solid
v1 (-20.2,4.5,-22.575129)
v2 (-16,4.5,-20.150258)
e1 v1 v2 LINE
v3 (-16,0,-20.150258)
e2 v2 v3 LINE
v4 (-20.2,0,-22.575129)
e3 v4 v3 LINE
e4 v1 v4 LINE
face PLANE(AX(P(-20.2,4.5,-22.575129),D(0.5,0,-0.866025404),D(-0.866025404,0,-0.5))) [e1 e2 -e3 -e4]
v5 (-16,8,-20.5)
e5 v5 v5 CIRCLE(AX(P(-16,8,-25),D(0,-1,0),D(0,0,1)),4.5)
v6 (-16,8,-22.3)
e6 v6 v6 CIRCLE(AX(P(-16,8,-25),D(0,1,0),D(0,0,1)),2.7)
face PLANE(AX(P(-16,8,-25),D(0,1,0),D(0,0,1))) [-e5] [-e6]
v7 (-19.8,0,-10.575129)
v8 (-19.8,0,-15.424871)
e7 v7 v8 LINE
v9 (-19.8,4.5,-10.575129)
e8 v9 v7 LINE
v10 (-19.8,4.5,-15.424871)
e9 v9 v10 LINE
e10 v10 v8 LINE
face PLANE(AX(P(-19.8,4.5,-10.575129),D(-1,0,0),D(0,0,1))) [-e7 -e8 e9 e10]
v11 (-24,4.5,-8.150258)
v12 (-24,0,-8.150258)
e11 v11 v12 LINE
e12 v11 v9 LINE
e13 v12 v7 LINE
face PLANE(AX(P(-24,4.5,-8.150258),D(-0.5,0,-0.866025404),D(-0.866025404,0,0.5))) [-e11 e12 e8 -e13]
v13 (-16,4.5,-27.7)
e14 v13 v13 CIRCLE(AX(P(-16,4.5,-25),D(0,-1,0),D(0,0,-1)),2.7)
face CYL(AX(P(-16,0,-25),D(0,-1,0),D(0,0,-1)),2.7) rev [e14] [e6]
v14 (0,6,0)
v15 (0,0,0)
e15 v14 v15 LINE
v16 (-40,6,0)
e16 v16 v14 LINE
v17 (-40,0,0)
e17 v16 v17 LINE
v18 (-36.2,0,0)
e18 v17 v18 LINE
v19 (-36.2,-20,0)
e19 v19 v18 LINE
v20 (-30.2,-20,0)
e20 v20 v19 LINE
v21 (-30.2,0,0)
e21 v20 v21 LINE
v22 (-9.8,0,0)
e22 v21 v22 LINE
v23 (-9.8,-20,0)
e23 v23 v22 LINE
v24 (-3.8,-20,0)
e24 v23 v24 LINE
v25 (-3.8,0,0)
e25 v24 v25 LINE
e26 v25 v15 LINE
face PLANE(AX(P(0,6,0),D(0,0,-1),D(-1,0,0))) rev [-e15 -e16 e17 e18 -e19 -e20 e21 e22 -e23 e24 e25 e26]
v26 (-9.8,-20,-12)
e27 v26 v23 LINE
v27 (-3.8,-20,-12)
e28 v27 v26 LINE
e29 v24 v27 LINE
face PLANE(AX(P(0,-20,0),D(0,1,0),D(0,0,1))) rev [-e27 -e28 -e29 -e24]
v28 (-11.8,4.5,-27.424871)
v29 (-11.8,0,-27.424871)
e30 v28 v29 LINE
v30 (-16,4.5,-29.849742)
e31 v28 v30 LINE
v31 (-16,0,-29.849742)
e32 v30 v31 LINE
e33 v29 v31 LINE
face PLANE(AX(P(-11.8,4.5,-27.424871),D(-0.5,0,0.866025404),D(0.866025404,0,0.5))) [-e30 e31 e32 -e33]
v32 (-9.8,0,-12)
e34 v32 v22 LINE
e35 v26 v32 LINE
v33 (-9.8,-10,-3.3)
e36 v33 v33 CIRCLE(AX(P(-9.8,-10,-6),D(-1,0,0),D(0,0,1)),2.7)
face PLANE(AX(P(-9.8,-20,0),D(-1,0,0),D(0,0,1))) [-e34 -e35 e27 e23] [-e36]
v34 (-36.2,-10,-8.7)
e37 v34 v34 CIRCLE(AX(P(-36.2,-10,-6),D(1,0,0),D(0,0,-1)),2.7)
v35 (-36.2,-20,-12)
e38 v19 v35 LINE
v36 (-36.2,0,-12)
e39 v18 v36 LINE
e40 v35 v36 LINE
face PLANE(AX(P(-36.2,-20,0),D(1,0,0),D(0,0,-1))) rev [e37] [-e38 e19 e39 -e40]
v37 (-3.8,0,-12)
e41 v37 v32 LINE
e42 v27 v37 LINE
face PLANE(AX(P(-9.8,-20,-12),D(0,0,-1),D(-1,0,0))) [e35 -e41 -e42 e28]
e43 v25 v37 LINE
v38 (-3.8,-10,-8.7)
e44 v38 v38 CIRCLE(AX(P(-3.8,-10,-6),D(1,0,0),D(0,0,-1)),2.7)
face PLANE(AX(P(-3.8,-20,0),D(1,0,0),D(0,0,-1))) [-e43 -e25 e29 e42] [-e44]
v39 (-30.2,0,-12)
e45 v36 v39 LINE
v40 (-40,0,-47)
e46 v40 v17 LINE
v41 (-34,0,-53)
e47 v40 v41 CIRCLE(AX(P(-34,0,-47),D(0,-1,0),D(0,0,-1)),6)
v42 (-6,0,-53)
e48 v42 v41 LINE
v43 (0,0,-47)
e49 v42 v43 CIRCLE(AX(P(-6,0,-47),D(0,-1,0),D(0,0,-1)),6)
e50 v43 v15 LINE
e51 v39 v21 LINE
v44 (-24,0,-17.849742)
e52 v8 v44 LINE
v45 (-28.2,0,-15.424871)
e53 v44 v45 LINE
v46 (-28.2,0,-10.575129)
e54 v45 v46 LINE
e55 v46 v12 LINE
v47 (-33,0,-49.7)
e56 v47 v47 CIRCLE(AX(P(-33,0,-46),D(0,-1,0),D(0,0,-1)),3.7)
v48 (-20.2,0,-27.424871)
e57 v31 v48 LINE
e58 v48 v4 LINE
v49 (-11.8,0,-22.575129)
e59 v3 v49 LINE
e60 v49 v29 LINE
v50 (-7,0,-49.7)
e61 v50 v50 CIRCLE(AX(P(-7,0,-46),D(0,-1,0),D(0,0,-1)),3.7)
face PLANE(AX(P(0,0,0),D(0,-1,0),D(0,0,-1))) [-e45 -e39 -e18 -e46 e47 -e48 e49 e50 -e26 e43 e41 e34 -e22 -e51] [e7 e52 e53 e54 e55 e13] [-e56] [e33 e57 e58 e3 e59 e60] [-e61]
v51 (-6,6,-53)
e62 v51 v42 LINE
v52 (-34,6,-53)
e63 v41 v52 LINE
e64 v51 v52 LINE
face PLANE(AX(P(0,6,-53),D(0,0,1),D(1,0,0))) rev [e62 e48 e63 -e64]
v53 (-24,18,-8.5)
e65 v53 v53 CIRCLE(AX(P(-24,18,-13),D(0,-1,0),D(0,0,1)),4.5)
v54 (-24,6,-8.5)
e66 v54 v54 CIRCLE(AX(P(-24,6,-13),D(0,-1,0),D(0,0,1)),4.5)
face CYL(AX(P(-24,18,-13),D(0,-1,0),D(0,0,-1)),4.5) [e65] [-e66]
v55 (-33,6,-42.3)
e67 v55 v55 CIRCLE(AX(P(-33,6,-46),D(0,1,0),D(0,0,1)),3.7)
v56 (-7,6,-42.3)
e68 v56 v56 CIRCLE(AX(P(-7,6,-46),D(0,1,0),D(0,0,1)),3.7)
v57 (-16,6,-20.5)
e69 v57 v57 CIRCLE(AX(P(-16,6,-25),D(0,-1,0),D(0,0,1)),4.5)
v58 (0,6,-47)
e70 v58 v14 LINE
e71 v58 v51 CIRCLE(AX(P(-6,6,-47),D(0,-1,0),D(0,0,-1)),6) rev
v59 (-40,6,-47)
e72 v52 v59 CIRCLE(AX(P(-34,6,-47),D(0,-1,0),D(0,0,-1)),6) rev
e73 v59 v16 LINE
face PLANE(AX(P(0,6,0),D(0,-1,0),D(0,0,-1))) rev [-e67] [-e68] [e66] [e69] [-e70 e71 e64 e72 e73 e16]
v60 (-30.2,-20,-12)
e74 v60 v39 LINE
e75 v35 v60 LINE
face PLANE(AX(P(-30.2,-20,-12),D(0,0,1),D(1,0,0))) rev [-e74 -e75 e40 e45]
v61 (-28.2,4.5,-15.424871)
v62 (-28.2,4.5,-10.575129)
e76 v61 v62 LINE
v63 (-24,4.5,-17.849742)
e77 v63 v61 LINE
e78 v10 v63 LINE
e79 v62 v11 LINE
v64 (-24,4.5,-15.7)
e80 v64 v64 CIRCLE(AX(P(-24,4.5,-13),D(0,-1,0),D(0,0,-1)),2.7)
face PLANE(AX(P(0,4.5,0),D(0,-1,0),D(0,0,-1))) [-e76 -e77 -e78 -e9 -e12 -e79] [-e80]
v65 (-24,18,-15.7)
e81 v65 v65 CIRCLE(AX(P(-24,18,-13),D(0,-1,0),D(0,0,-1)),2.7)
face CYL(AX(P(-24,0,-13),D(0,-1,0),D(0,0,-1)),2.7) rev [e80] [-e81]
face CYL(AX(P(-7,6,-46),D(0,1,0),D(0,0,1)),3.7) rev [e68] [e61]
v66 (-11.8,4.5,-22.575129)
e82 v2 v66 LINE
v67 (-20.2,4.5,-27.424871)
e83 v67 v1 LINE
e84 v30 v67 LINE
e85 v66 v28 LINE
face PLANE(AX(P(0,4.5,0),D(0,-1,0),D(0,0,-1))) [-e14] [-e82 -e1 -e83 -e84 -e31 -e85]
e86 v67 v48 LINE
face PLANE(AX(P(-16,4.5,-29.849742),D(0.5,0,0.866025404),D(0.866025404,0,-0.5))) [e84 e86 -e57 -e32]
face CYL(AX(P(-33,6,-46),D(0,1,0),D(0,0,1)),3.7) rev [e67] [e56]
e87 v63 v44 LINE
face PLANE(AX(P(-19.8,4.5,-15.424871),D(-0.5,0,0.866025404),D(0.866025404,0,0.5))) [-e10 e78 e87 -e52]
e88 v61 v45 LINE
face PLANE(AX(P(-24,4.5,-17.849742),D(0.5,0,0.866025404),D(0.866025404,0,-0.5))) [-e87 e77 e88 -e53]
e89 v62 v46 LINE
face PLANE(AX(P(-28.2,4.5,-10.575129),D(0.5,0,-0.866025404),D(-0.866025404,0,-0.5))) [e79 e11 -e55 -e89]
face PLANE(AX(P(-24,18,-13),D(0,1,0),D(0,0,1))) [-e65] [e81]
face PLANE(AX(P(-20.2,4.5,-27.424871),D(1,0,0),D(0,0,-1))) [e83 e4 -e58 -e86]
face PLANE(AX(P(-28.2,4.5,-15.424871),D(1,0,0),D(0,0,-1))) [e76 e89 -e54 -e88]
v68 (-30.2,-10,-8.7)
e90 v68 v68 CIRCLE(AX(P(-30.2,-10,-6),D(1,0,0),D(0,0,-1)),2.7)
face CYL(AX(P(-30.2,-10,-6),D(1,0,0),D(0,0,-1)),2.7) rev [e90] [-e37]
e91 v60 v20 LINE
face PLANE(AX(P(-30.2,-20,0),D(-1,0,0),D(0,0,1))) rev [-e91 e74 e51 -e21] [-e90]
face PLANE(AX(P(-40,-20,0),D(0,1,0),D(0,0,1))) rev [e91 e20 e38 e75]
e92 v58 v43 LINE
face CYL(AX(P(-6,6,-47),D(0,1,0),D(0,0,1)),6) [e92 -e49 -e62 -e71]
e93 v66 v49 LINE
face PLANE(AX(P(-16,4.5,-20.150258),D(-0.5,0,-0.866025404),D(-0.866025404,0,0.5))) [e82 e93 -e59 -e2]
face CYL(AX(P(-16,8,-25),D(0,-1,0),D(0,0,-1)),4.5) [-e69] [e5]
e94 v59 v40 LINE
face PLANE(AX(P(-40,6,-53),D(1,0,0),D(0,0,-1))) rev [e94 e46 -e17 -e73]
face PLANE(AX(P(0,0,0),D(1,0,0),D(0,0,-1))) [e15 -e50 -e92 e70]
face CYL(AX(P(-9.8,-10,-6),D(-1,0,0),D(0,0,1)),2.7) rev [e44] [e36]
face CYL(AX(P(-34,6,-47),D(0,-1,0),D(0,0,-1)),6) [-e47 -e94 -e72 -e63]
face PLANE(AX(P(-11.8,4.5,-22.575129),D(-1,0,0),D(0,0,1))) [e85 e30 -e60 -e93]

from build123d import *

# Parameters (mm, degrees)
SKETCH1_W             = 40
SKETCH1_H             = 53
BOSS_EXTRUDE1_DEPTH   = 6
SKETCH16_R            = 4.5
BOSS_EXTRUDE3_DEPTH   = 2
SKETCH16_3_R          = 4.5
BOSS_EXTRUDE4_DEPTH   = 12
CUT_EXTRUDE1_DEPTH    = 4.5
F_5_4MM_DOWEL_HOLE1_D = 5.4
F_7_4MM_DOWEL_HOLE2_D = 7.4
SKETCH2_W             = 6
SKETCH2_H             = 12
BOSS_EXTRUDE2_DEPTH   = 20
F_5_4MM_DOWEL_HOLE3_D = 5.4
FILLET1_R             = 6
MIRROR2_OUTLINE_R     = 3.7
MIRROR2_DEPTH         = 6
MIRROR2_START         = 4.5
MIRROR2_2_OUTLINE_R   = 4.5
MIRROR2_2_OUTLINE_R_2 = 2.7
MIRROR2_2_DEPTH       = 13.5
MIRROR2_3_OUTLINE_R   = 4.5
MIRROR2_3_OUTLINE_R_2 = 2.7
MIRROR2_3_DEPTH       = 3.5
MIRROR2_4_DEPTH       = 1.5
MIRROR2_START_2       = -36.2
MIRROR2_5_OUTLINE_W   = 20
MIRROR2_5_OUTLINE_H   = 12
MIRROR2_5_OUTLINE_R   = 2.7
MIRROR2_5_DEPTH       = 6
MIRROR2_START_3       = -9.8
MIRROR2_6_OUTLINE_W   = 20
MIRROR2_6_OUTLINE_H   = 12
MIRROR2_6_OUTLINE_R   = 2.7
MIRROR2_6_DEPTH       = 6


# Read off the part's stored shape, not the designer's step: Mirror2
with BuildPart() as part:
    # Sketch1 → Boss-Extrude1 (new body)
    with BuildSketch(Plane(origin=(0, 0, 0), x_dir=(1, 0, 0), z_dir=(0, 1, 0))):
        with Locations((20, 26.5)):
            Rectangle(SKETCH1_W, SKETCH1_H)
    extrude(amount=BOSS_EXTRUDE1_DEPTH)

    # Sketch16 → Boss-Extrude3 (add)
    with BuildSketch(Plane(origin=(0, 6, 0), x_dir=(1, 0, 0), z_dir=(0, 1, 0))):
        with Locations(Location((16, 25, 0), (0, 0, 90))):
            Circle(SKETCH16_R)
    extrude(amount=BOSS_EXTRUDE3_DEPTH)

    # Sketch16<3> → Boss-Extrude4 (add)
    with BuildSketch(Plane(origin=(0, 6, 0), x_dir=(1, 0, 0), z_dir=(0, 1, 0))):
        with Locations(Location((24, 13, 0), (0, 0, 90))):
            Circle(SKETCH16_3_R)
    extrude(amount=BOSS_EXTRUDE4_DEPTH)

    # Sketch12 → Cut-Extrude1 (cut)
    with BuildSketch(Plane.XZ):
        Polygon((28.2, -10.575128869), (24, -8.150257739), (19.8, -10.575128869), (19.8, -15.424871131), (24, -17.849742261), (28.2, -15.424871131), align=None)
        Polygon((16, -20.150257739), (11.8, -22.575128869), (11.8, -27.424871131), (16, -29.849742261), (20.2, -27.424871131), (20.2, -22.575128869), align=None)
    extrude(amount=-CUT_EXTRUDE1_DEPTH, mode=Mode.SUBTRACT)

    # Ø5.4mm Dowel Hole1 (through all)
    with Locations(Plane(origin=(0, 0, 0), x_dir=(-1, 0, 0), z_dir=(0, -1, 0))):
        with Locations((-16, 25), (-24, 13)):
            Hole(F_5_4MM_DOWEL_HOLE1_D / 2)

    # Ø7.4mm Dowel Hole2 (through all)
    with Locations(Plane(origin=(0, 6, 0), x_dir=(1, 0, 0), z_dir=(0, 1, 0))):
        with Locations((7, 46)):
            f_7_4mm_dowel_hole2 = Hole(F_7_4MM_DOWEL_HOLE2_D / 2)

    # Sketch2 → Boss-Extrude2 (add)
    with BuildSketch(Plane.XZ):
        with Locations((6.8, -6)):
            Rectangle(SKETCH2_W, SKETCH2_H)
    boss_extrude2 = extrude(amount=BOSS_EXTRUDE2_DEPTH)

    # Ø5.4mm Dowel Hole3 (through all)
    with Locations(Plane(origin=(9.8, 0, 0), x_dir=(0, 0, -1), z_dir=(1, 0, 0))):
        with Locations((6, -10)):
            f_5_4mm_dowel_hole3 = Hole(F_5_4MM_DOWEL_HOLE3_D / 2)

    # Mirror1: Ø7.4mm Dowel Hole2, Boss-Extrude2, Ø5.4mm Dowel Hole3 across plane
    add(f_7_4mm_dowel_hole2.mirror(Plane(origin=(20, 0, 0), x_dir=(0, 0, 1), z_dir=(1, 0, 0))), mode=Mode.SUBTRACT)
    add(boss_extrude2.mirror(Plane(origin=(20, 0, 0), x_dir=(0, 0, 1), z_dir=(1, 0, 0))))
    add(f_5_4mm_dowel_hole3.mirror(Plane(origin=(20, 0, 0), x_dir=(0, 0, 1), z_dir=(1, 0, 0))), mode=Mode.SUBTRACT)

    # Fillet1
    fillet1_edges = [part.edges().sort_by_distance(p)[0] for p in [
        (0, 3, -53),
        (40, 3, -53),
    ]]
    fillet(fillet1_edges, radius=FILLET1_R)

    # Mirror2 outline → Mirror2 (add)
    with BuildSketch(Plane(origin=(0, 0, 0), x_dir=(1, 0, 0), z_dir=(0, 1, 0))):
        with BuildLine():
            Line((-6, 53), (-34, 53))
            ThreePointArc((-34, 53), (-38.242640687, 51.242640687), (-40, 47))
            Line((-40, 47), (-40, 0))
            Line((-40, 0), (0, 0))
            Line((0, 0), (0, 47))
            ThreePointArc((0, 47), (-1.757359313, 51.242640687), (-6, 53))
        make_face()
        Polygon((-19.8, 10.575128869), (-24, 8.150257739), (-28.2, 10.575128869), (-28.2, 15.424871131), (-24, 17.849742261), (-19.8, 15.424871131), align=None, mode=Mode.SUBTRACT)
        with Locations((-33, 46)):
            Circle(MIRROR2_OUTLINE_R, mode=Mode.SUBTRACT)
        with Locations((-7, 46)):
            Circle(MIRROR2_OUTLINE_R, mode=Mode.SUBTRACT)
        Polygon((-11.8, 27.424871131), (-11.8, 22.575128869), (-16, 20.150257739), (-20.2, 22.575128869), (-20.2, 27.424871131), (-16, 29.849742261), align=None, mode=Mode.SUBTRACT)
    extrude(amount=MIRROR2_DEPTH)

    # Mirror2 2 outline → Mirror2 2 (add)
    with BuildSketch(Plane(origin=(0, 0, 0), x_dir=(1, 0, 0), z_dir=(0, 1, 0)).offset(MIRROR2_START)):
        with Locations((-24, 13)):
            Circle(MIRROR2_2_OUTLINE_R)
        with Locations((-24, 13)):
            Circle(MIRROR2_2_OUTLINE_R_2, mode=Mode.SUBTRACT)
    extrude(amount=MIRROR2_2_DEPTH)

    # Mirror2 3 outline → Mirror2 3 (add)
    with BuildSketch(Plane(origin=(0, 0, 0), x_dir=(1, 0, 0), z_dir=(0, 1, 0)).offset(MIRROR2_START)):
        with Locations((-16, 25)):
            Circle(MIRROR2_3_OUTLINE_R)
        with Locations((-16, 25)):
            Circle(MIRROR2_3_OUTLINE_R_2, mode=Mode.SUBTRACT)
    extrude(amount=MIRROR2_3_DEPTH)

    # Mirror2 4 outline → Mirror2 4 (add)
    with BuildSketch(Plane(origin=(0, 0, 0), x_dir=(1, 0, 0), z_dir=(0, 1, 0)).offset(MIRROR2_START)):
        with BuildLine():
            ThreePointArc((-20.500893142, 15.829531975), (-20.102885683, 15.25), (-19.8, 14.615549442))
            Line((-19.8, 14.615549442), (-19.8, 15.424871131))
            Line((-19.8, 15.424871131), (-20.500893142, 15.829531975))
        make_face()
        with BuildLine():
            Line((-19.8, 10.575128869), (-19.8, 11.384450558))
            ThreePointArc((-19.8, 11.384450558), (-20.102885683, 10.75), (-20.500893142, 10.170468025))
            Line((-20.500893142, 10.170468025), (-19.8, 10.575128869))
        make_face()
        with BuildLine():
            ThreePointArc((-24.700893142, 17.445081417), (-24, 17.5), (-23.299106858, 17.445081417))
            Line((-23.299106858, 17.445081417), (-24, 17.849742261))
            Line((-24, 17.849742261), (-24.700893142, 17.445081417))
        make_face()
        with BuildLine():
            Line((-24, 8.150257739), (-23.299106858, 8.554918583))
            ThreePointArc((-23.299106858, 8.554918583), (-24, 8.5), (-24.700893142, 8.554918583))
            Line((-24.700893142, 8.554918583), (-24, 8.150257739))
        make_face()
        with BuildLine():
            ThreePointArc((-28.2, 14.615549442), (-27.897114317, 15.25), (-27.499106858, 15.829531975))
            Line((-27.499106858, 15.829531975), (-28.2, 15.424871131))
            Line((-28.2, 15.424871131), (-28.2, 14.615549442))
        make_face()
        with BuildLine():
            Line((-28.2, 10.575128869), (-27.499106858, 10.170468025))
            ThreePointArc((-27.499106858, 10.170468025), (-27.897114317, 10.75), (-28.2, 11.384450558))
            Line((-28.2, 11.384450558), (-28.2, 10.575128869))
        make_face()
        with BuildLine():
            ThreePointArc((-12.500893142, 27.829531975), (-12.102885683, 27.25), (-11.8, 26.615549442))
            Line((-11.8, 26.615549442), (-11.8, 27.424871131))
            Line((-11.8, 27.424871131), (-12.500893142, 27.829531975))
        make_face()
        with BuildLine():
            Line((-11.8, 22.575128869), (-11.8, 23.384450558))
            ThreePointArc((-11.8, 23.384450558), (-12.102885683, 22.75), (-12.500893142, 22.170468025))
            Line((-12.500893142, 22.170468025), (-11.8, 22.575128869))
        make_face()
        with BuildLine():
            ThreePointArc((-16.700893142, 29.445081417), (-16, 29.5), (-15.299106858, 29.445081417))
            Line((-15.299106858, 29.445081417), (-16, 29.849742261))
            Line((-16, 29.849742261), (-16.700893142, 29.445081417))
        make_face()
        with BuildLine():
            Line((-16, 20.150257739), (-15.299106858, 20.554918583))
            ThreePointArc((-15.299106858, 20.554918583), (-16, 20.5), (-16.700893142, 20.554918583))
            Line((-16.700893142, 20.554918583), (-16, 20.150257739))
        make_face()
        with BuildLine():
            ThreePointArc((-20.2, 26.615549442), (-19.897114317, 27.25), (-19.499106858, 27.829531975))
            Line((-19.499106858, 27.829531975), (-20.2, 27.424871131))
            Line((-20.2, 27.424871131), (-20.2, 26.615549442))
        make_face()
        with BuildLine():
            Line((-20.2, 22.575128869), (-19.499106858, 22.170468025))
            ThreePointArc((-19.499106858, 22.170468025), (-19.897114317, 22.75), (-20.2, 23.384450558))
            Line((-20.2, 23.384450558), (-20.2, 22.575128869))
        make_face()
    extrude(amount=MIRROR2_4_DEPTH)

    # Mirror2 5 outline → Mirror2 5 (add)
    with BuildSketch(Plane.YZ.offset(MIRROR2_START_2)):
        with Locations((-10, -6)):
            Rectangle(MIRROR2_5_OUTLINE_W, MIRROR2_5_OUTLINE_H)
        with Locations((-10, -6)):
            Circle(MIRROR2_5_OUTLINE_R, mode=Mode.SUBTRACT)
    extrude(amount=MIRROR2_5_DEPTH)

    # Mirror2 6 outline → Mirror2 6 (add)
    with BuildSketch(Plane.YZ.offset(MIRROR2_START_3)):
        with Locations((-10, -6)):
            Rectangle(MIRROR2_6_OUTLINE_W, MIRROR2_6_OUTLINE_H)
        with Locations((-10, -6)):
            Circle(MIRROR2_6_OUTLINE_R, mode=Mode.SUBTRACT)
    extrude(amount=MIRROR2_6_DEPTH)

    # Split1
    split(bisect_by=Plane(origin=(0, 0, 0), x_dir=(0, 0, 1), z_dir=(1, 0, 0)), keep=Keep.BOTTOM)


solid = part.part
